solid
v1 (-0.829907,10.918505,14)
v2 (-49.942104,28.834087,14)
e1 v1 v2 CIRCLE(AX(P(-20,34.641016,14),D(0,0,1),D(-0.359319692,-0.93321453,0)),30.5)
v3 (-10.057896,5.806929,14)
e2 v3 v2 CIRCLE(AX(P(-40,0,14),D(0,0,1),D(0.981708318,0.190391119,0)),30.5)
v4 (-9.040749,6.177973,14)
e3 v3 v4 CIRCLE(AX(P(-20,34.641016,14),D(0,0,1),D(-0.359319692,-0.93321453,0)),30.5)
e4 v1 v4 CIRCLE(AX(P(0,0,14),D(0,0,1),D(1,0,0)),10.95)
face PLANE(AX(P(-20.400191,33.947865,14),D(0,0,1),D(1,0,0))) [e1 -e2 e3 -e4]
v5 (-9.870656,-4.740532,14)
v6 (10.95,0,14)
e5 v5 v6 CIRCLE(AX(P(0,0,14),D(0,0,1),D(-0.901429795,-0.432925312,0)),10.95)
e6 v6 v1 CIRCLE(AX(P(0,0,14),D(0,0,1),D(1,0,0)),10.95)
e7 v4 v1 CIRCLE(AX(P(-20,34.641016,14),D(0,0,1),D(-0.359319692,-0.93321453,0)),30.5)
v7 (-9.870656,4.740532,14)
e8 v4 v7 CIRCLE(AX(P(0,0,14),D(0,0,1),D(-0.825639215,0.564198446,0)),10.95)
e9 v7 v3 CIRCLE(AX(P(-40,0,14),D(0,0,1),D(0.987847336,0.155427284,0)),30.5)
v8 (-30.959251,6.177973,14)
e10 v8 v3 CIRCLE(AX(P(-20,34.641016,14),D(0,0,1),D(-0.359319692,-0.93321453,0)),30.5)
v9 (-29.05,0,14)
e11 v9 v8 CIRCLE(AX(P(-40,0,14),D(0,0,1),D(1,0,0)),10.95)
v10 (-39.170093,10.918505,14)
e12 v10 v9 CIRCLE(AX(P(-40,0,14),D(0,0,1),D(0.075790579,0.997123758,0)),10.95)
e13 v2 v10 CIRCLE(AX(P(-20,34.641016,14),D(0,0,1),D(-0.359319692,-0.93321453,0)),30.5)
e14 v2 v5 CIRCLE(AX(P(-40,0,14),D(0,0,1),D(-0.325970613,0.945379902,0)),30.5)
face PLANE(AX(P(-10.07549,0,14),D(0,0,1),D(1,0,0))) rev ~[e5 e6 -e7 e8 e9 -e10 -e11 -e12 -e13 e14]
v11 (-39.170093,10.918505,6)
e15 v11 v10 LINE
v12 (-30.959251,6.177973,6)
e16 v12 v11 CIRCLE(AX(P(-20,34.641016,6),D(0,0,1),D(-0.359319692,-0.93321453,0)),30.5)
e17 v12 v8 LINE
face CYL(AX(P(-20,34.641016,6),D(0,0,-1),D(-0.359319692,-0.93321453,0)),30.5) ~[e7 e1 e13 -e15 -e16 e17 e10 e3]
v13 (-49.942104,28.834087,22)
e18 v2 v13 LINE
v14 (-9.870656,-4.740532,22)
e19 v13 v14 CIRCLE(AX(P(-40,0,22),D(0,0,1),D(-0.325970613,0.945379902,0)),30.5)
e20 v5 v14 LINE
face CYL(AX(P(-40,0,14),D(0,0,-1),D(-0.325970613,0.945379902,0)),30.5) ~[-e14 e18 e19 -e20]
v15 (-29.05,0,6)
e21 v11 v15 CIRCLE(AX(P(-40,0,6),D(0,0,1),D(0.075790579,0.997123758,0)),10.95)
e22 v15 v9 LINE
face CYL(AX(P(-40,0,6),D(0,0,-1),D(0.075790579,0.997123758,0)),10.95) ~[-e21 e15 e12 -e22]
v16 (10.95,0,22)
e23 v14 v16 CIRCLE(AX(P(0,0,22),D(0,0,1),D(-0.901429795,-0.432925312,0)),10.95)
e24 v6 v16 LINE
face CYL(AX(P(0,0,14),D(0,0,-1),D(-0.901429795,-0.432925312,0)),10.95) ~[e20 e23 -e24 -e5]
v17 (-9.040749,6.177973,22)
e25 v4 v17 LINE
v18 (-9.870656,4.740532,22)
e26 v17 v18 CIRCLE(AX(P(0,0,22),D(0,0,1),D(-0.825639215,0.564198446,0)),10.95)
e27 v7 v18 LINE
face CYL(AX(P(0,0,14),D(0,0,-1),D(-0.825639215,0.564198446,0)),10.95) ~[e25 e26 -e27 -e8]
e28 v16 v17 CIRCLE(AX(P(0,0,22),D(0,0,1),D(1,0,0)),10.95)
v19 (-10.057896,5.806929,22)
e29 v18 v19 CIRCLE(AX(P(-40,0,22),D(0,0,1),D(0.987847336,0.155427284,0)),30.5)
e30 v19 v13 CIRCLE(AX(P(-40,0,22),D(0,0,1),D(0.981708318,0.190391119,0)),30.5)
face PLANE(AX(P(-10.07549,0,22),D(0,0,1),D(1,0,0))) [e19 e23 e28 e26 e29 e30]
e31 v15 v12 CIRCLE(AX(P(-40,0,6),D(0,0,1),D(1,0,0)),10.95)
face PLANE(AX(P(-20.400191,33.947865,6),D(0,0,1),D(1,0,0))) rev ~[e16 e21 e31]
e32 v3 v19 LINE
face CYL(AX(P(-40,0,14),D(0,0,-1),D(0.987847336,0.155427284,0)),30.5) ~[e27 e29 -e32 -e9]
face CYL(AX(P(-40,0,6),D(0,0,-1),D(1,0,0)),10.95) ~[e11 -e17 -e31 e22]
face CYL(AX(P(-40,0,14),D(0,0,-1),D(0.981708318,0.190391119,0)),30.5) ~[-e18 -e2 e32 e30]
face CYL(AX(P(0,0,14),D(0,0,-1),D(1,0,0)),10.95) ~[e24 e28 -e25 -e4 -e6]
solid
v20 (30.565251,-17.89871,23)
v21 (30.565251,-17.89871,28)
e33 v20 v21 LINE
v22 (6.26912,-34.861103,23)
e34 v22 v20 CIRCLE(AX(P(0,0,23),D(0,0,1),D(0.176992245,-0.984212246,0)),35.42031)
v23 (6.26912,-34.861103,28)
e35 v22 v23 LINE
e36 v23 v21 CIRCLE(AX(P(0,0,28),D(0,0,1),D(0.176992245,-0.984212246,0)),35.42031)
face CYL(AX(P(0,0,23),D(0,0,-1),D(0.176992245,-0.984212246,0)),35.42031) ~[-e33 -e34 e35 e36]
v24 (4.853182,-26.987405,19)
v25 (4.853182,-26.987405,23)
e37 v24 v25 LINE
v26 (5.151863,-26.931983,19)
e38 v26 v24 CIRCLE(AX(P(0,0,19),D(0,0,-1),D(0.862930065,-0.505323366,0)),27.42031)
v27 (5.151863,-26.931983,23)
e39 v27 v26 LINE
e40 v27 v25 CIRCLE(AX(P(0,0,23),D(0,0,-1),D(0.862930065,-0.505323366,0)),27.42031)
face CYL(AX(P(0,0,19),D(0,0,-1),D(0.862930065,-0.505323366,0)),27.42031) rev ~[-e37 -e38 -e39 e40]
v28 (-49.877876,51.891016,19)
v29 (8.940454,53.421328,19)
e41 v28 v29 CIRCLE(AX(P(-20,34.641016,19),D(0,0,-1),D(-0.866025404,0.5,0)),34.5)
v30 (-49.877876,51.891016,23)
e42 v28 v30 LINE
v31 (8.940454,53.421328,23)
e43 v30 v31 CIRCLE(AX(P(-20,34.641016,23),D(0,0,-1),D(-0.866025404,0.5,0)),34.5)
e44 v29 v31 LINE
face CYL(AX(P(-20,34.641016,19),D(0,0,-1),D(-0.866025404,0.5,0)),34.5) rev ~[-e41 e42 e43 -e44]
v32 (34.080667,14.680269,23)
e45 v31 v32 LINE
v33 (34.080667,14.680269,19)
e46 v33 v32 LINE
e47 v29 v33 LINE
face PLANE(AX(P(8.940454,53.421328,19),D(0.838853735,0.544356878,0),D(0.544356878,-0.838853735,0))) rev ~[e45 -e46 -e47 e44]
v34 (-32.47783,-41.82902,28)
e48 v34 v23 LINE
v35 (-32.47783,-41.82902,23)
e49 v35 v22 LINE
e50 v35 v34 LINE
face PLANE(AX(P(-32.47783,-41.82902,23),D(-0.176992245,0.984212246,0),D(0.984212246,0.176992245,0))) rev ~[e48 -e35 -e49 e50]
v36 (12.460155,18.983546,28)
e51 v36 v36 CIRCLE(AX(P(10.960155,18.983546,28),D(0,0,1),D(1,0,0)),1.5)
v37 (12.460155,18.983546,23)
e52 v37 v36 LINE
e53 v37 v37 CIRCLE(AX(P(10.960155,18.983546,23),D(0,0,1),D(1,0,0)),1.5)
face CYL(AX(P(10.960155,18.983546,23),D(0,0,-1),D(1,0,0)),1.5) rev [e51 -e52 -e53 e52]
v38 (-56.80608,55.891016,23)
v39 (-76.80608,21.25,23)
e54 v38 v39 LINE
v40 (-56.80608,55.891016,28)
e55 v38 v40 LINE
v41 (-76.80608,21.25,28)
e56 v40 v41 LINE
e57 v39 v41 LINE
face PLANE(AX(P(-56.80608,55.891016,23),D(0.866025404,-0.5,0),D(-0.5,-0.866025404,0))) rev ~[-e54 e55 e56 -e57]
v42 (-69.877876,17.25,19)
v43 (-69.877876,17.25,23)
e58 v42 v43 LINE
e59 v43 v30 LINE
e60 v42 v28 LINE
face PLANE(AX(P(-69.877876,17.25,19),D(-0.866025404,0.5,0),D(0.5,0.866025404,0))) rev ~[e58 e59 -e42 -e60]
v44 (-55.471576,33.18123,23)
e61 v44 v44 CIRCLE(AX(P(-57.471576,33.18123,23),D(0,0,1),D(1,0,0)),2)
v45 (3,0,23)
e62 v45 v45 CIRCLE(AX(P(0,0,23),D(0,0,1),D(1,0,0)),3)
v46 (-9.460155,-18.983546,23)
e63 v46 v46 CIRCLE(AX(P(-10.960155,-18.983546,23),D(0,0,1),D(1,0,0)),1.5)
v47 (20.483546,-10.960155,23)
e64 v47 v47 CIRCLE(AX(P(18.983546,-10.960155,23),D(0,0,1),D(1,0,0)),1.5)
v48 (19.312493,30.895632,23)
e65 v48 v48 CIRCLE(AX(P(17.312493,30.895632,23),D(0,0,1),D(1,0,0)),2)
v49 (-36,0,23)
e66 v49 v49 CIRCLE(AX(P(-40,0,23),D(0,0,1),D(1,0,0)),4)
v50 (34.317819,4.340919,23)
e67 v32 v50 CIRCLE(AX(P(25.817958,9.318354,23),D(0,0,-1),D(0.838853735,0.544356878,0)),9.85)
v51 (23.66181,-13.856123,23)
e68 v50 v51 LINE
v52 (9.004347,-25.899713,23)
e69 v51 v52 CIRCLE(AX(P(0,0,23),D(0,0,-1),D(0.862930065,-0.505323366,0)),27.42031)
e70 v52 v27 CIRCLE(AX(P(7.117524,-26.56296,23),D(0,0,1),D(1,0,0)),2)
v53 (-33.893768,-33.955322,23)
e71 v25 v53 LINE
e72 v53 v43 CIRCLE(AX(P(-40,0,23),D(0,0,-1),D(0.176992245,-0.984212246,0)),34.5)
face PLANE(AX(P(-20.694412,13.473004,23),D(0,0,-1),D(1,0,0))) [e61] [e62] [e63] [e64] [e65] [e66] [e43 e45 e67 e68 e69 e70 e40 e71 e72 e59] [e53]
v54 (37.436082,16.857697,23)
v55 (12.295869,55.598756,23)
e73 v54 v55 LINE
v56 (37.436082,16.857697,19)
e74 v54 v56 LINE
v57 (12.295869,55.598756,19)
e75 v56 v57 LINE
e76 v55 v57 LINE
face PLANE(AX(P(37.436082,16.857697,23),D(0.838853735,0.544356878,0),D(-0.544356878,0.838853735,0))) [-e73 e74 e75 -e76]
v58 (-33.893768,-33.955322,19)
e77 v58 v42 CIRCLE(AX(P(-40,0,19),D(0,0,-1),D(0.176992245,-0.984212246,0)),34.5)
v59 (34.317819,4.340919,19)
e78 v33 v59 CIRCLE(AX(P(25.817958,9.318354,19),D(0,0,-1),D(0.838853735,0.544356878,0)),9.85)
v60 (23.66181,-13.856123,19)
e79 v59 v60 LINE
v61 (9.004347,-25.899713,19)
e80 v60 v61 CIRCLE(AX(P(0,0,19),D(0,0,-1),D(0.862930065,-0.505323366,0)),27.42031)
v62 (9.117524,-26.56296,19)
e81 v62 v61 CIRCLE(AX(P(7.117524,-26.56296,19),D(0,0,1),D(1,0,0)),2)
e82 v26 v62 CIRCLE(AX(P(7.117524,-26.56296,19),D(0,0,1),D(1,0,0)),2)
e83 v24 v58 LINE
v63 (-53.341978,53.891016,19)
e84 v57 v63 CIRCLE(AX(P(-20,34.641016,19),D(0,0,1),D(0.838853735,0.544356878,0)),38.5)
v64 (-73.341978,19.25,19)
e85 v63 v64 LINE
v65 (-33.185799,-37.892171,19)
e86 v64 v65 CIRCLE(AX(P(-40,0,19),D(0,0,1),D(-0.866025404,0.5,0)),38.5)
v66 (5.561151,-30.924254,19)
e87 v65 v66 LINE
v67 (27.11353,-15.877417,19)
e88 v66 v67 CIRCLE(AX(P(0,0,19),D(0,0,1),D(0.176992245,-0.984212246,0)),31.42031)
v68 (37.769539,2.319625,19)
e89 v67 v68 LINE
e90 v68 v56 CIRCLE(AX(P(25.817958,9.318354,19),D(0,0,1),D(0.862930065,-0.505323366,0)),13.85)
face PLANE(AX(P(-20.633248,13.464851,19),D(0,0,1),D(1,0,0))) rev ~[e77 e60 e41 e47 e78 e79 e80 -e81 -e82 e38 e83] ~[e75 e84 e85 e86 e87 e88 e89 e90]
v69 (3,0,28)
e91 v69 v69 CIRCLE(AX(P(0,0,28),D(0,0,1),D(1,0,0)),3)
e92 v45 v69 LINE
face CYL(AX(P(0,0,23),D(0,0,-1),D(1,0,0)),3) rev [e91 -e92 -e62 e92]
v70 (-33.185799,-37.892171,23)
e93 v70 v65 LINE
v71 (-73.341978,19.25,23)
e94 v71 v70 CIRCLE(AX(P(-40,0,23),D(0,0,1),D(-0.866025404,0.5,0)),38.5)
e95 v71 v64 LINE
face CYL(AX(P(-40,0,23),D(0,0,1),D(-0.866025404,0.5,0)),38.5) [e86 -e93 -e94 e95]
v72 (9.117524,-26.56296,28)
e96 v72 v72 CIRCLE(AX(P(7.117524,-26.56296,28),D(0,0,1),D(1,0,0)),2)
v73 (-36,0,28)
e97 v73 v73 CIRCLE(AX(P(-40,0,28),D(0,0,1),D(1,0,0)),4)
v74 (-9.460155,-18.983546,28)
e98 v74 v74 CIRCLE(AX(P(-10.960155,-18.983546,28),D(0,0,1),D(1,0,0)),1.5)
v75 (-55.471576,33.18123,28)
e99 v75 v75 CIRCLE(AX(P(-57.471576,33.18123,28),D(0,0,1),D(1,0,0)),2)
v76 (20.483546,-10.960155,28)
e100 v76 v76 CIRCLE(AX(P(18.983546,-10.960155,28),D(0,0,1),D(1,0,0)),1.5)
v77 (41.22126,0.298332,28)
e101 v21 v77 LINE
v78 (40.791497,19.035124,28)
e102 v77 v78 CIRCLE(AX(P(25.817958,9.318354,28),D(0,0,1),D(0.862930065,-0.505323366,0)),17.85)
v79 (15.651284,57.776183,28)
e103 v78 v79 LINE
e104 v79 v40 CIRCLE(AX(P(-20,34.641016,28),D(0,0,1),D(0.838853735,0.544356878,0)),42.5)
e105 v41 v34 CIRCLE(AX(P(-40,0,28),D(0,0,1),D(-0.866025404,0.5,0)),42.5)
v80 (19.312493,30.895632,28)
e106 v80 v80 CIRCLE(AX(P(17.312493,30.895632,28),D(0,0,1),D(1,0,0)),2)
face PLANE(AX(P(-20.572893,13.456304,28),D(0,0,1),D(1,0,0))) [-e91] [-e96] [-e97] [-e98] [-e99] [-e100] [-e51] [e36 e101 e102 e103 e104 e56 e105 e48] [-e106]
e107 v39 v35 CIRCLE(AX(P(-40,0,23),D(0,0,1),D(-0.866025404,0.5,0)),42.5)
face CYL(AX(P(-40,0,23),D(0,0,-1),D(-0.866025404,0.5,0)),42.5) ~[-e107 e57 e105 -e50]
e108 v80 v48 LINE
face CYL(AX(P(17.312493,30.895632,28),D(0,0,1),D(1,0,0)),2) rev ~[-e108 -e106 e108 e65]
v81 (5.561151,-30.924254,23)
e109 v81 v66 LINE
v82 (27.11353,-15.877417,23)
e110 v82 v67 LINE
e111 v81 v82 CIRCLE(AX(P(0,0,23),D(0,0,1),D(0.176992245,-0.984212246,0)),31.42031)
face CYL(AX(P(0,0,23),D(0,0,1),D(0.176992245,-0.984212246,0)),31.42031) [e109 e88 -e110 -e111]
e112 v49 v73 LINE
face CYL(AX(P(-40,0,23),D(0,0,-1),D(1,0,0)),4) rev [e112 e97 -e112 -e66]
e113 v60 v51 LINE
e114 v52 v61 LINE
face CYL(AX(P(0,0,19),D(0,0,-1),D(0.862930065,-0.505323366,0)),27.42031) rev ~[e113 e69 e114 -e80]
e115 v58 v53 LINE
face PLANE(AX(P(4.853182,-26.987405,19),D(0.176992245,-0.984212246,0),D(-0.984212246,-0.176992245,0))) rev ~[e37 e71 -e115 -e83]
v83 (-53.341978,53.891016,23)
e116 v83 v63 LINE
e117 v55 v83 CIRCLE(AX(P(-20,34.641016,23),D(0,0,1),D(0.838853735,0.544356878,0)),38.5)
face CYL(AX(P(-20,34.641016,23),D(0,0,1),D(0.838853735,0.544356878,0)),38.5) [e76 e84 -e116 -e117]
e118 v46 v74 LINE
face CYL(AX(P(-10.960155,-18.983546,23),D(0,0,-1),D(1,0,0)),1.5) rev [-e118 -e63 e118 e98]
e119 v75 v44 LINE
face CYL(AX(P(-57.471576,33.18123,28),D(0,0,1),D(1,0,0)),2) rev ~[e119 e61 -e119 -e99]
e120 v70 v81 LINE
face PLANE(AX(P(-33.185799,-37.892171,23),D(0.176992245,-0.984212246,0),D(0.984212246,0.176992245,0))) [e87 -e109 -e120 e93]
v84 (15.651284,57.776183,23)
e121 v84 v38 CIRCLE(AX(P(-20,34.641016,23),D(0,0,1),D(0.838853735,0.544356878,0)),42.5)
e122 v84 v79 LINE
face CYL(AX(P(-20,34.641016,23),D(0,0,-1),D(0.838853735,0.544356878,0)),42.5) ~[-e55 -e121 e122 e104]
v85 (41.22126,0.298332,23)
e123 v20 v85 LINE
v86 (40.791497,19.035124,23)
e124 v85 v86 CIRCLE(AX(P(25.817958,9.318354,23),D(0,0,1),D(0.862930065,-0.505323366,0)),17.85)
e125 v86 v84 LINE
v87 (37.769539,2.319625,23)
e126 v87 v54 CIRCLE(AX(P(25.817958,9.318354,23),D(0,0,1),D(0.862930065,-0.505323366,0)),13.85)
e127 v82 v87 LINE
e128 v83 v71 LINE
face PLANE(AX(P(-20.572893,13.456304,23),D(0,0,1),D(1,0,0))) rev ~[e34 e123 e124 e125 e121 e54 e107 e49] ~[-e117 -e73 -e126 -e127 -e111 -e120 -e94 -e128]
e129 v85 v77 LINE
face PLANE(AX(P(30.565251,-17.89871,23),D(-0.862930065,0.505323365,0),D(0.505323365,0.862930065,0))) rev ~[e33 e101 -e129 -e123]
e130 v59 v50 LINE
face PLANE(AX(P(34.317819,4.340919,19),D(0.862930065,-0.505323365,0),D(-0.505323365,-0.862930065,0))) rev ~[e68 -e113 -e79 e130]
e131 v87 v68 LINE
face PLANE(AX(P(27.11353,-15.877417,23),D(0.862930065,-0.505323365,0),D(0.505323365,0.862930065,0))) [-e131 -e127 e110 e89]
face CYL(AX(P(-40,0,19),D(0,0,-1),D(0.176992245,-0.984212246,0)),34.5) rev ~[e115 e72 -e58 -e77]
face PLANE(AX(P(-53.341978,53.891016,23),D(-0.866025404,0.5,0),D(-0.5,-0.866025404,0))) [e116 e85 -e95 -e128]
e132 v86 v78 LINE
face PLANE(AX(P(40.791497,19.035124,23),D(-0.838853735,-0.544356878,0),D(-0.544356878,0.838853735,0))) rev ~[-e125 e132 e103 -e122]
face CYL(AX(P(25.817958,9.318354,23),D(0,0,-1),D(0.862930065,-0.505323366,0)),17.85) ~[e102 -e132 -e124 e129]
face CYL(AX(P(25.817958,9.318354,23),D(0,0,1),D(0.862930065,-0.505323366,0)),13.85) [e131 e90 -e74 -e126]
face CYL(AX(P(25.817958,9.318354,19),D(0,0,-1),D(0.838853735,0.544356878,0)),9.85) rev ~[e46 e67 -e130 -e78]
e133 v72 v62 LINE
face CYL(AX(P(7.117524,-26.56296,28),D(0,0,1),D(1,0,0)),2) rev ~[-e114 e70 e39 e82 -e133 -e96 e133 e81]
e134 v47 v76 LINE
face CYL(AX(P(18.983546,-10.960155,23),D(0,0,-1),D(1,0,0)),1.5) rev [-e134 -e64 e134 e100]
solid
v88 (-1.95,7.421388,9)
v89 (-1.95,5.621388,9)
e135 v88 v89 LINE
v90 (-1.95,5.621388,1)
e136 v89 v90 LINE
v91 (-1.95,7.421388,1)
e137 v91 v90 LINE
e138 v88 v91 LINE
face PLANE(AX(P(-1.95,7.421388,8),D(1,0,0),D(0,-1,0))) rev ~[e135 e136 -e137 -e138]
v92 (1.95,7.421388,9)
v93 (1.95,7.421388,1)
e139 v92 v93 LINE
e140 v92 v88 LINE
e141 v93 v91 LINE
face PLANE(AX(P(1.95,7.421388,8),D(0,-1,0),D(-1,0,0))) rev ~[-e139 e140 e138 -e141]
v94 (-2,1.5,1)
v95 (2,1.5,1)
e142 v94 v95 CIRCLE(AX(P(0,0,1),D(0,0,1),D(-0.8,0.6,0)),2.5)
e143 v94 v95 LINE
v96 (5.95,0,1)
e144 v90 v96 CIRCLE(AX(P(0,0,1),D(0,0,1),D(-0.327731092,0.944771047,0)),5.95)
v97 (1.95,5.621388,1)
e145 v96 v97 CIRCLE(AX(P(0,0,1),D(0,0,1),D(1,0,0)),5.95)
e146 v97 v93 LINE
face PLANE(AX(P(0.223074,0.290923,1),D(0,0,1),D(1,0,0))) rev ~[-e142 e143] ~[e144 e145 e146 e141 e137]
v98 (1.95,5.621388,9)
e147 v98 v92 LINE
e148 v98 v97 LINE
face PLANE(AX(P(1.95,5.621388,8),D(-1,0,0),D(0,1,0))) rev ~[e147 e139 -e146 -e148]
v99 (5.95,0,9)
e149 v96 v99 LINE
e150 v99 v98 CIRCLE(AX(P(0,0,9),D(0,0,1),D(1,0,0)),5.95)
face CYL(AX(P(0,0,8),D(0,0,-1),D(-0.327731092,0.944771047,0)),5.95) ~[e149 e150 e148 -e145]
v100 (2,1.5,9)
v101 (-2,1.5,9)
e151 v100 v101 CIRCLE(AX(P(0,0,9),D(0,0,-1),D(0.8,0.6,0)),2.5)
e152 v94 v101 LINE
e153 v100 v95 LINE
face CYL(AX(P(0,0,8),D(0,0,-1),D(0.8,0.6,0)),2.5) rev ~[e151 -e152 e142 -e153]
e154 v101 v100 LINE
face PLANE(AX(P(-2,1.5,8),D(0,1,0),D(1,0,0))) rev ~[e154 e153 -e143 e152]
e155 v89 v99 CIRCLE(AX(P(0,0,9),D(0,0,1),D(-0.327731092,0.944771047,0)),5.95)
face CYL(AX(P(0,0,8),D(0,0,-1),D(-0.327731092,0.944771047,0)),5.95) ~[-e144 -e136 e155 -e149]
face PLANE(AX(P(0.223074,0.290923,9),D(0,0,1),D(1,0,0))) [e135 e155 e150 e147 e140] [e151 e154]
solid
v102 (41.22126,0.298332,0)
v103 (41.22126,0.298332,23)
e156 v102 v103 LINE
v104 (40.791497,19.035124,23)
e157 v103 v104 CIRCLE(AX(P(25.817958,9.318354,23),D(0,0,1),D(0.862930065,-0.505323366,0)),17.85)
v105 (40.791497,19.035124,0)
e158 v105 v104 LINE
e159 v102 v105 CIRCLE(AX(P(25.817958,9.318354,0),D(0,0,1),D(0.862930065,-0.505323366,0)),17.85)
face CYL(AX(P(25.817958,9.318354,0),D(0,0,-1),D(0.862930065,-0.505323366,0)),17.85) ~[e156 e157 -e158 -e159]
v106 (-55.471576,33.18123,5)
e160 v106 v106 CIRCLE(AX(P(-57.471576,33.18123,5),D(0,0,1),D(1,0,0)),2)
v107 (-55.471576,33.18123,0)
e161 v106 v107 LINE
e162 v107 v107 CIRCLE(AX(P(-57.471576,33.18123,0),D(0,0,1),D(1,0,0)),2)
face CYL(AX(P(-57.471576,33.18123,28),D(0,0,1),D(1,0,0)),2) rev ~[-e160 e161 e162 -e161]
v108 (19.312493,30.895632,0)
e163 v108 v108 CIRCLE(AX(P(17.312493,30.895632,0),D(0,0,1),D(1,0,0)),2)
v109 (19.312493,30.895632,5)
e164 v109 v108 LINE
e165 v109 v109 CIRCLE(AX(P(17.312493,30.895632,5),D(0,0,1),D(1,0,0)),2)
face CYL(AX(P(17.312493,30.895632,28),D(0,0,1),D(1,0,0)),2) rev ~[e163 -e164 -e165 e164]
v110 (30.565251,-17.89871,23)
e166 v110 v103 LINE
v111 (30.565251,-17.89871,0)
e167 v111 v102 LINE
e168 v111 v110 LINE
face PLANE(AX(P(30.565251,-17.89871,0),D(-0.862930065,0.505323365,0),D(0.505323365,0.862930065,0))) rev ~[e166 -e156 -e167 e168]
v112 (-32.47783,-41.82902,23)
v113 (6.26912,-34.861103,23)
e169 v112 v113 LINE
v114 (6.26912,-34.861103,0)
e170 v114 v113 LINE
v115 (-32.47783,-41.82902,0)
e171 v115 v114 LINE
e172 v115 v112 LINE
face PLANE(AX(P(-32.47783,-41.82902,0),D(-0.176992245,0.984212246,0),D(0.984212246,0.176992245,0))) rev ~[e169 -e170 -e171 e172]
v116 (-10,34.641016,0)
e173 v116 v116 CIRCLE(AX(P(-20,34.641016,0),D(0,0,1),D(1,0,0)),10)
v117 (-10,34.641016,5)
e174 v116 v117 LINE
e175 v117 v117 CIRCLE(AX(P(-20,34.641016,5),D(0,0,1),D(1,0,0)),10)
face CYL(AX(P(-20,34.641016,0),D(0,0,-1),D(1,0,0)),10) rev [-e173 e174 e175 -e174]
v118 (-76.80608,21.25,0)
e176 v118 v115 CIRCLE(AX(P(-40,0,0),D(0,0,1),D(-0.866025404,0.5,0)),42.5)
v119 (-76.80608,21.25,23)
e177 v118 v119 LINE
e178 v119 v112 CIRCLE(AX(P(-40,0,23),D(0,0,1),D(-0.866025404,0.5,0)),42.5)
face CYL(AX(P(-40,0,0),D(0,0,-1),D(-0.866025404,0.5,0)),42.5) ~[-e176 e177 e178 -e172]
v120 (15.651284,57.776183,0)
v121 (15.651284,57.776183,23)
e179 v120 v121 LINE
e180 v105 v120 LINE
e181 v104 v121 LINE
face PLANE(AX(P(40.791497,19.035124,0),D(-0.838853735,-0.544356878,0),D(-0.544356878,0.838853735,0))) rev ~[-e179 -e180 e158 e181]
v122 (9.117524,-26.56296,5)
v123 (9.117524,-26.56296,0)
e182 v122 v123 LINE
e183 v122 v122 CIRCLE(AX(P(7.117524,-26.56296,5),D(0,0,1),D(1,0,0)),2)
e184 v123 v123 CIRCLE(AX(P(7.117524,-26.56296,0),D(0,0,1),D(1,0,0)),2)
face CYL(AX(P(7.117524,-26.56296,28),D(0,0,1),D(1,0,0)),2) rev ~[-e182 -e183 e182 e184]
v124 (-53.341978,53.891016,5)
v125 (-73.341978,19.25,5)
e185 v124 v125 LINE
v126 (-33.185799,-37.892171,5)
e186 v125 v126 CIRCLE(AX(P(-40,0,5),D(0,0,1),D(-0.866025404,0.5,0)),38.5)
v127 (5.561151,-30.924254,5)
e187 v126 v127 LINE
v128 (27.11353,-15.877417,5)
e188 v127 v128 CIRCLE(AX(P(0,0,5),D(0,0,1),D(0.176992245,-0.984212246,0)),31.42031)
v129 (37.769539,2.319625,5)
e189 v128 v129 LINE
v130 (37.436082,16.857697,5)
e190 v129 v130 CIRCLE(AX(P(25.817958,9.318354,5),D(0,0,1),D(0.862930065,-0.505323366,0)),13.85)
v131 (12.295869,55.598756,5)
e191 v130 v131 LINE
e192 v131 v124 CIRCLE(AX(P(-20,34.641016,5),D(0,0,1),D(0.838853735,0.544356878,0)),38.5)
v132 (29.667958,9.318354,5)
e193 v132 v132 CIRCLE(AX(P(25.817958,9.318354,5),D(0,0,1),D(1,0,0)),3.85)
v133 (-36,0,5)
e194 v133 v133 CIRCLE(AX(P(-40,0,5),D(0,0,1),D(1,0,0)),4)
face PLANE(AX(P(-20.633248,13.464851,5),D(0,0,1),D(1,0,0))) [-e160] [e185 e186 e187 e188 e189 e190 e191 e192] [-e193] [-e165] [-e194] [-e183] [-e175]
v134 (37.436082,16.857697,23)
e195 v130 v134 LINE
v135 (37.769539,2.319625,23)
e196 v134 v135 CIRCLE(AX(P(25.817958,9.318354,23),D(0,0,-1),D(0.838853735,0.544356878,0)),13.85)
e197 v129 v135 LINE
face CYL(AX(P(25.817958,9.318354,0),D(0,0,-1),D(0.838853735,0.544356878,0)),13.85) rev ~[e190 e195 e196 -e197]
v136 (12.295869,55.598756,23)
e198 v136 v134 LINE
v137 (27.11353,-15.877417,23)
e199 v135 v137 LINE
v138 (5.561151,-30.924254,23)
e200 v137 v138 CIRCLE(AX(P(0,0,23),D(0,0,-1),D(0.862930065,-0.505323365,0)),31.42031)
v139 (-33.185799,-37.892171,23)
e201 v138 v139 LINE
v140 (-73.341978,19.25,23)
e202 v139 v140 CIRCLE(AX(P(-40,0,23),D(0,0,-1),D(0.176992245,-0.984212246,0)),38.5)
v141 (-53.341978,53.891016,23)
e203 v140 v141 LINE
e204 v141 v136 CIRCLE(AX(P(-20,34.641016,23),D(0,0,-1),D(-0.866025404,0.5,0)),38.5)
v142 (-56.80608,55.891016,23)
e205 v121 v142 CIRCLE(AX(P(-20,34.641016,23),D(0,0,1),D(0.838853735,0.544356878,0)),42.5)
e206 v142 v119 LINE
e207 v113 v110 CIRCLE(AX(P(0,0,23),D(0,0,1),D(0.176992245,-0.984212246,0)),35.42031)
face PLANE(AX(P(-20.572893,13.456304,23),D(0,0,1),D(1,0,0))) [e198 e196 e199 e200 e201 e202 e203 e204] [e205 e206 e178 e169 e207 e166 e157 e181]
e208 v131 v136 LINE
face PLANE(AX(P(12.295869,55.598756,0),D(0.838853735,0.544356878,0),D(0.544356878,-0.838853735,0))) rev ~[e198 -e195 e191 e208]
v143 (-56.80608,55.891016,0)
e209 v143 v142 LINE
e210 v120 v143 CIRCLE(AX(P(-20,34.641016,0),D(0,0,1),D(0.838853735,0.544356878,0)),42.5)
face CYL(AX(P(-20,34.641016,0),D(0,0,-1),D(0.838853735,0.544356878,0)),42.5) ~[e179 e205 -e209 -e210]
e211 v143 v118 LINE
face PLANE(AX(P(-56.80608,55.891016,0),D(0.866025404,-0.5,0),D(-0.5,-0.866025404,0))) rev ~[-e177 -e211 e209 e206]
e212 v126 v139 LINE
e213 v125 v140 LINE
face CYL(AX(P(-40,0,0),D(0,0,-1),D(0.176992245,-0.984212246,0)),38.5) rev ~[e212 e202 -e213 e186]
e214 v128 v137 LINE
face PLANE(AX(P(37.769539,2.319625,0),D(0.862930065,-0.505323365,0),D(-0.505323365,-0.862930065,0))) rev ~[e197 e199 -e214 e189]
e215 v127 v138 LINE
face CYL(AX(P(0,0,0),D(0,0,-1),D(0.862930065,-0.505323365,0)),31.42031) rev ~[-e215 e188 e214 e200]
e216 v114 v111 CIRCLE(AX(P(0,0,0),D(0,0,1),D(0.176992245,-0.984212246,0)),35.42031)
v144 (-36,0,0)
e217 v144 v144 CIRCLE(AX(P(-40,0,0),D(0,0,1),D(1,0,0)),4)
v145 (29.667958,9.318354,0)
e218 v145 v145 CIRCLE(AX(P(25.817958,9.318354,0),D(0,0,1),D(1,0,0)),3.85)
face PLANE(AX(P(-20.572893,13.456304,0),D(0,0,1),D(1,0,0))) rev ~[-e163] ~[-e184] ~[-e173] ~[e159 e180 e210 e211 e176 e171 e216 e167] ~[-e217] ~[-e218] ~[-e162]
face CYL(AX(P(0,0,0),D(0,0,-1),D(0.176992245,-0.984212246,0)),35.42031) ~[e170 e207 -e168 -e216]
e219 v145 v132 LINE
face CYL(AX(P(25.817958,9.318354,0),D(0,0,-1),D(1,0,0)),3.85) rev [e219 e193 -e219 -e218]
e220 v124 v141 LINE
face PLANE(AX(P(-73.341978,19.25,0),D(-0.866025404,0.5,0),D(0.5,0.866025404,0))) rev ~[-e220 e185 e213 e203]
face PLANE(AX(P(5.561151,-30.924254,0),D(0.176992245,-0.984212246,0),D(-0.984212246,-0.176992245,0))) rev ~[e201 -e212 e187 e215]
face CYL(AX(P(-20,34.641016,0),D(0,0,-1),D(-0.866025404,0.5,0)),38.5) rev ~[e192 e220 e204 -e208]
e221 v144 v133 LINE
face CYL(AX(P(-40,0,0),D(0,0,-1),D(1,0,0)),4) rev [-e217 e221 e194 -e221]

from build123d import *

# Parameters (mm, degrees)
F0_R      = 2.5
F1_DEPTH  = 8
F3_DEPTH  = 8
F5_DEPTH  = 1
F6_DEPTH  = 1
F4_R      = 4
F4_R_2    = 1.5
F4_R_3    = 3
F4_R_4    = 3.85
F4_R_5    = 10
F7_DEPTH  = 5
F8_DEPTH  = 23
F11_DEPTH = 8
F13_DEPTH = 8
F14_R     = 4
F14_R_2   = 1.5
F14_R_3   = 3
F15_DEPTH = 5
F16_DEPTH = 4
F17_R     = 1.5
F17_R_2   = 4
F17_R_3   = 3
F18_DEPTH = 4
F19_R     = 2
F20_DEPTH = 40


with BuildPart() as f1:
    # F0 (on Top) → F1 (new body)
    with BuildSketch(Plane.XY):
        with BuildLine():
            ThreePointArc((-1.95, 5.621387729), (-3.4496376621, -4.8479377059), (5.95, 0))
            ThreePointArc((5.95, 0), (4.8479377059, 3.4496376621), (1.95, 5.621387729))
            Line((1.95, 5.621387729), (-1.95, 5.621387729))
        make_face()
        Circle(F0_R, mode=Mode.SUBTRACT)
        with BuildLine():
            Line((-1.95, 5.621387729), (1.95, 5.621387729))
            ThreePointArc((1.95, 5.621387729), (0, 5.95), (-1.95, 5.621387729))
        make_face()
        with BuildLine():
            ThreePointArc((-1.95, 5.621387729), (0, 5.95), (1.95, 5.621387729))
            Line((1.95, 5.621387729), (1.95, 7.421387729))
            Line((1.95, 7.421387729), (-1.95, 7.421387729))
            Line((-1.95, 7.421387729), (-1.95, 5.621387729))
        make_face()
    extrude(amount=F1_DEPTH)

    # F2 (on face) → F3 (join, through all)
    with BuildSketch(Plane.XY.offset(8)):
        with BuildLine():
            ThreePointArc((2, 1.5), (0, 2.5), (-2, 1.5))
            Line((-2, 1.5), (2, 1.5))
        make_face()
    extrude(amount=-F3_DEPTH)

    # F5 (cut): a face of the model
    f5_faces = [f1.faces().sort_by_distance(p)[0] for p in [
        (1.7710016732, 6.521387729, 0),
    ]]
    extrude(f5_faces, amount=-F5_DEPTH, mode=Mode.SUBTRACT)

    # F6 (add): a face of the model
    f6_faces = [f1.faces().sort_by_distance(p)[0] for p in [
        (1.7710016732, 6.521387729, 8),
    ]]
    extrude(f6_faces, amount=F6_DEPTH)


with BuildPart() as f7:
    # F4 (on Top) → F7 (new body)
    with BuildSketch(Plane.XY):
        with BuildLine():
            Line((-53.3419780457, 53.8910161514), (-73.3419780457, 19.25))
            ThreePointArc((-73.3419780457, 19.25), (-71.4998043396, -22.1362220482), (-33.1857985837, -37.8921714746))
            Line((-33.1857985837, -37.8921714746), (5.5611512307, -30.9242540914))
            ThreePointArc((5.5611512307, -30.9242540914), (17.9863984999, -25.7628679134), (27.1135303231, -15.8774169038))
            Line((27.1135303231, -15.8774169038), (37.769539487, 2.3196254325))
            ThreePointArc((37.769539487, 2.3196254325), (39.6643163027, 9.6359455026), (37.4360823271, 16.8576968067))
            Line((37.4360823271, 16.8576968067), (12.2958688092, 55.5987559594))
            ThreePointArc((12.2958688092, 55.5987559594), (-21.0013390768, 73.127992131), (-53.3419780457, 53.8910161514))
        make_face()
        with Locations((-40, 0)):
            Circle(F4_R, mode=Mode.SUBTRACT)
        with Locations((-10.9601551084, -18.9835455066)):
            Circle(F4_R_2, mode=Mode.SUBTRACT)
        Circle(F4_R_3, mode=Mode.SUBTRACT)
        with Locations((18.9835455066, -10.9601551084)):
            Circle(F4_R_2, mode=Mode.SUBTRACT)
        with Locations((25.8179580932, 9.3183540446)):
            Circle(F4_R_4, mode=Mode.SUBTRACT)
        with Locations((-20, 34.6410161514)):
            Circle(F4_R_5, mode=Mode.SUBTRACT)
        with Locations((10.9601551084, 18.9835455066)):
            Circle(F4_R_2, mode=Mode.SUBTRACT)
        with Locations((-10.9601551084, -18.9835455066)):
            Circle(F4_R_2)
        Circle(F4_R_3)
        with Locations((18.9835455066, -10.9601551084)):
            Circle(F4_R_2)
        with Locations((10.9601551084, 18.9835455066)):
            Circle(F4_R_2)
    extrude(amount=F7_DEPTH)

    # F4 (on Top) → F8 (join)
    with BuildSketch(Plane.XY):
        with BuildLine():
            Line((-56.8060796608, 55.8910161514), (-76.8060796608, 21.25))
            ThreePointArc((-76.8060796608, 21.25), (-74.7725112839, -24.436089274), (-32.4778296053, -41.8290204589))
            Line((-32.4778296053, -41.8290204589), (6.269120209, -34.8611030758))
            ThreePointArc((6.269120209, -34.8611030758), (20.2761783749, -29.0426404854), (30.5652505813, -17.8987103658))
            Line((30.5652505813, -17.8987103658), (41.2212597451, 0.2983319705))
            ThreePointArc((41.2212597451, 0.2983319705), (43.663264522, 9.7276686673), (40.7914972683, 19.0351243193))
            Line((40.7914972683, 19.0351243193), (15.6512837504, 57.776183472))
            ThreePointArc((15.6512837504, 57.776183472), (-21.1053743055, 77.126638986), (-56.8060796608, 55.8910161514))
        make_face()
        with BuildLine():
            ThreePointArc((-33.1857985837, -37.8921714746), (-71.4998043396, -22.1362220482), (-73.3419780457, 19.25))
            Line((-73.3419780457, 19.25), (-53.3419780457, 53.8910161514))
            ThreePointArc((-53.3419780457, 53.8910161514), (-21.0013390768, 73.127992131), (12.2958688092, 55.5987559594))
            Line((12.2958688092, 55.5987559594), (37.4360823271, 16.8576968067))
            ThreePointArc((37.4360823271, 16.8576968067), (39.6643163027, 9.6359455026), (37.769539487, 2.3196254325))
            Line((37.769539487, 2.3196254325), (27.1135303231, -15.8774169038))
            ThreePointArc((27.1135303231, -15.8774169038), (17.9863984999, -25.7628679134), (5.5611512307, -30.9242540914))
            Line((5.5611512307, -30.9242540914), (-33.1857985837, -37.8921714746))
        make_face(mode=Mode.SUBTRACT)
    extrude(amount=F8_DEPTH)


with BuildPart() as f11:
    # F10 (on offset) → F11 (new body)
    with BuildSketch(Plane.XY.offset(6)):
        with BuildLine():
            ThreePointArc((-30.9592505938, 6.1779729827), (-2.737426946, 9.4963632097), (10.5, 34.6410161514))
            ThreePointArc((10.5, 34.6410161514), (-33.1446216898, 62.1631694216), (-39.1700931562, 10.9185051463))
            ThreePointArc((-39.1700931562, 10.9185051463), (-34.525, 9.4829781714), (-30.9592505938, 6.1779729827))
        make_face()
        with BuildLine():
            ThreePointArc((-30.9592505938, 6.1779729827), (-34.525, 9.4829781714), (-39.1700931562, 10.9185051463))
            ThreePointArc((-39.1700931562, 10.9185051463), (-35.25, 8.227241336), (-30.9592505938, 6.1779729827))
        make_face()
        with BuildLine():
            ThreePointArc((-30.9592505938, 6.1779729827), (-35.25, 8.227241336), (-39.1700931562, 10.9185051463))
            ThreePointArc((-39.1700931562, 10.9185051463), (-48.0308772852, -7.4436221042), (-29.05, 0))
            ThreePointArc((-29.05, 0), (-29.538195519, 3.2331326916), (-30.9592505938, 6.1779729827))
        make_face()
    extrude(amount=F11_DEPTH)

    # F12 (on face) → F13 (join)
    with BuildSketch(Plane.XY.offset(14)):
        with BuildLine():
            ThreePointArc((-9.87065625, -4.7405321636), (-9.5928052562, -2.3775003286), (-9.5, 0))
            ThreePointArc((-9.5, 0), (-9.5928052562, 2.3775003286), (-9.87065625, 4.7405321636))
            ThreePointArc((-9.87065625, 4.7405321636), (-10.95, 0), (-9.87065625, -4.7405321636))
        make_face()
        with BuildLine():
            ThreePointArc((-9.87065625, 4.7405321636), (-9.5928052562, 2.3775003286), (-9.5, 0))
            ThreePointArc((-9.5, 0), (-9.5928052562, -2.3775003286), (-9.87065625, -4.7405321636))
            ThreePointArc((-9.87065625, -4.7405321636), (2.4309271958, -10.6767547958), (10.95, 0))
            ThreePointArc((10.95, 0), (7.4436221042, 8.0308772852), (-0.8299068438, 10.9185051463))
            ThreePointArc((-0.8299068438, 10.9185051463), (-4.75, 8.227241336), (-9.0407494062, 6.1779729827))
            ThreePointArc((-9.0407494062, 6.1779729827), (-9.4829781714, 5.475), (-9.87065625, 4.7405321636))
        make_face()
        with BuildLine():
            ThreePointArc((-9.87065625, -4.7405321636), (-10.95, 0), (-9.87065625, 4.7405321636))
            ThreePointArc((-9.87065625, 4.7405321636), (-9.9595439395, 5.2745615624), (-10.0578962995, 5.806929136))
            ThreePointArc((-10.0578962995, 5.806929136), (-20.5413550912, 4.1458208796), (-30.9592505938, 6.1779729827))
            ThreePointArc((-30.9592505938, 6.1779729827), (-45.475, -9.4829781714), (-39.1700931562, 10.9185051463))
            ThreePointArc((-39.1700931562, 10.9185051463), (-46.1389362532, 18.9245912541), (-49.9421037005, 28.8340870154))
            ThreePointArc((-49.9421037005, 28.8340870154), (-59.5881323372, -23.3785173085), (-9.87065625, -4.7405321636))
        make_face()
        with BuildLine():
            ThreePointArc((-30.9592505938, 6.1779729827), (-20.5413550912, 4.1458208796), (-10.0578962995, 5.806929136))
            ThreePointArc((-10.0578962995, 5.806929136), (-24.75, 26.4137748154), (-49.9421037005, 28.8340870154))
            ThreePointArc((-49.9421037005, 28.8340870154), (-46.1389362532, 18.9245912541), (-39.1700931562, 10.9185051463))
            ThreePointArc((-39.1700931562, 10.9185051463), (-45.475, -9.4829781714), (-30.9592505938, 6.1779729827))
        make_face()
        with BuildLine():
            ThreePointArc((-0.8299068438, 10.9185051463), (-5.475, 9.4829781714), (-9.0407494062, 6.1779729827))
            ThreePointArc((-9.0407494062, 6.1779729827), (-4.75, 8.227241336), (-0.8299068438, 10.9185051463))
        make_face()
    extrude(amount=F13_DEPTH)


with BuildPart() as f15:
    # F14 (on face) → F15 (new body)
    with BuildSketch(Plane.XY.offset(23)):
        with BuildLine():
            ThreePointArc((6.269120209, -34.8611030758), (20.2761783749, -29.0426404854), (30.5652505813, -17.8987103658))
            Line((30.5652505813, -17.8987103658), (41.2212597451, 0.2983319705))
            ThreePointArc((41.2212597451, 0.2983319705), (43.663264522, 9.7276686673), (40.7914972683, 19.0351243193))
            Line((40.7914972683, 19.0351243193), (15.6512837504, 57.776183472))
            ThreePointArc((15.6512837504, 57.776183472), (-21.1053743055, 77.126638986), (-56.8060796608, 55.8910161514))
            Line((-56.8060796608, 55.8910161514), (-76.8060796608, 21.25))
            ThreePointArc((-76.8060796608, 21.25), (-74.7725112839, -24.436089274), (-32.4778296053, -41.8290204589))
            Line((-32.4778296053, -41.8290204589), (6.269120209, -34.8611030758))
        make_face()
        with BuildLine():
            ThreePointArc((27.1135303231, -15.8774169038), (17.9863984999, -25.7628679134), (5.5611512307, -30.9242540914))
            Line((5.5611512307, -30.9242540914), (-33.1857985837, -37.8921714746))
            ThreePointArc((-33.1857985837, -37.8921714746), (-71.4998043396, -22.1362220482), (-73.3419780457, 19.25))
            Line((-73.3419780457, 19.25), (-53.3419780457, 53.8910161514))
            ThreePointArc((-53.3419780457, 53.8910161514), (-21.0013390768, 73.127992131), (12.2958688092, 55.5987559594))
            Line((12.2958688092, 55.5987559594), (37.4360823271, 16.8576968067))
            ThreePointArc((37.4360823271, 16.8576968067), (39.6643163027, 9.6359455026), (37.769539487, 2.3196254325))
            Line((37.769539487, 2.3196254325), (27.1135303231, -15.8774169038))
        make_face(mode=Mode.SUBTRACT)
        with BuildLine():
            Line((-33.1857985837, -37.8921714746), (5.5611512307, -30.9242540914))
            ThreePointArc((5.5611512307, -30.9242540914), (17.9863984999, -25.7628679134), (27.1135303231, -15.8774169038))
            Line((27.1135303231, -15.8774169038), (37.769539487, 2.3196254325))
            ThreePointArc((37.769539487, 2.3196254325), (39.6643163027, 9.6359455026), (37.4360823271, 16.8576968067))
            Line((37.4360823271, 16.8576968067), (12.2958688092, 55.5987559594))
            ThreePointArc((12.2958688092, 55.5987559594), (-21.0013390768, 73.127992131), (-53.3419780457, 53.8910161514))
            Line((-53.3419780457, 53.8910161514), (-73.3419780457, 19.25))
            ThreePointArc((-73.3419780457, 19.25), (-71.4998043396, -22.1362220482), (-33.1857985837, -37.8921714746))
        make_face()
        with Locations((-40, 0)):
            Circle(F14_R, mode=Mode.SUBTRACT)
        with Locations((-10.9601551084, -18.9835455066)):
            Circle(F14_R_2, mode=Mode.SUBTRACT)
        Circle(F14_R_3, mode=Mode.SUBTRACT)
        with Locations((18.9835455066, -10.9601551084)):
            Circle(F14_R_2, mode=Mode.SUBTRACT)
        with Locations((10.9601551084, 18.9835455066)):
            Circle(F14_R_2, mode=Mode.SUBTRACT)
    extrude(amount=F15_DEPTH)

    # F14 (on face) → F16 (join)
    with BuildSketch(Plane.XY.offset(23)):
        with BuildLine():
            Line((-33.1857985837, -37.8921714746), (5.5611512307, -30.9242540914))
            ThreePointArc((5.5611512307, -30.9242540914), (17.9863984999, -25.7628679134), (27.1135303231, -15.8774169038))
            Line((27.1135303231, -15.8774169038), (37.769539487, 2.3196254325))
            ThreePointArc((37.769539487, 2.3196254325), (39.6643163027, 9.6359455026), (37.4360823271, 16.8576968067))
            Line((37.4360823271, 16.8576968067), (12.2958688092, 55.5987559594))
            ThreePointArc((12.2958688092, 55.5987559594), (-21.0013390768, 73.127992131), (-53.3419780457, 53.8910161514))
            Line((-53.3419780457, 53.8910161514), (-73.3419780457, 19.25))
            ThreePointArc((-73.3419780457, 19.25), (-71.4998043396, -22.1362220482), (-33.1857985837, -37.8921714746))
        make_face()
        with Locations((-40, 0)):
            Circle(F14_R, mode=Mode.SUBTRACT)
        with Locations((-10.9601551084, -18.9835455066)):
            Circle(F14_R_2, mode=Mode.SUBTRACT)
        Circle(F14_R_3, mode=Mode.SUBTRACT)
        with Locations((18.9835455066, -10.9601551084)):
            Circle(F14_R_2, mode=Mode.SUBTRACT)
        with Locations((10.9601551084, 18.9835455066)):
            Circle(F14_R_2, mode=Mode.SUBTRACT)
    extrude(amount=-F16_DEPTH)

    # F17 (on face) → F18 (cut)
    with BuildSketch(Plane(origin=(0, 0, 19), x_dir=(1, 0, 0), z_dir=(0, 0, -1))):
        with BuildLine():
            Line((8.9404538679, -53.4213284469), (34.0806673859, -14.6802692942))
            ThreePointArc((34.0806673859, -14.6802692942), (35.6653680833, -9.5442223378), (34.3178192289, -4.3409188945))
            Line((34.3178192289, -4.3409188945), (23.661810065, 13.8561234418))
            ThreePointArc((23.661810065, 13.8561234418), (15.696618625, 22.4830953413), (4.8531822524, 26.987405107))
            Line((4.8531822524, 26.987405107), (-33.893767562, 33.9553224902))
            ThreePointArc((-33.893767562, 33.9553224902), (-68.2270973952, 19.8363548224), (-69.8778764306, -17.25))
            Line((-69.8778764306, -17.25), (-49.8778764306, -51.8910161514))
            ThreePointArc((-49.8778764306, -51.8910161514), (-20.897303848, -69.1293452759), (8.9404538679, -53.4213284469))
        make_face()
        with Locations((10.9601551084, -18.9835455066)):
            Circle(F17_R, mode=Mode.SUBTRACT)
        with Locations((-40, 0)):
            Circle(F17_R_2, mode=Mode.SUBTRACT)
        Circle(F17_R_3, mode=Mode.SUBTRACT)
        with Locations((-10.9601551084, 18.9835455066)):
            Circle(F17_R, mode=Mode.SUBTRACT)
        with Locations((18.9835455066, 10.9601551084)):
            Circle(F17_R, mode=Mode.SUBTRACT)
    extrude(amount=-F18_DEPTH, mode=Mode.SUBTRACT)


with BuildPart() as f20_tool:
    # F19 (on face) → F20 (new body)
    with BuildSketch(Plane.XY.offset(28)):
        with Locations((-57.4715762198, 33.1812300013)):
            Circle(F19_R)
        with Locations((17.3124925328, 30.8956321939)):
            Circle(F19_R)
        with Locations((7.1175237403, -26.5629602229)):
            Circle(F19_R)
    extrude(amount=-F20_DEPTH)


with BuildPart() as f7_1:
    add(f7.part)

    # F20: cut by f20_tool
    add(f20_tool.part, mode=Mode.SUBTRACT)


with BuildPart() as f15_1:
    add(f15.part)

    # F20: cut by f20_tool
    add(f20_tool.part, mode=Mode.SUBTRACT)


solid = Compound([f1.part, f11.part, f7_1.part, f15_1.part])
